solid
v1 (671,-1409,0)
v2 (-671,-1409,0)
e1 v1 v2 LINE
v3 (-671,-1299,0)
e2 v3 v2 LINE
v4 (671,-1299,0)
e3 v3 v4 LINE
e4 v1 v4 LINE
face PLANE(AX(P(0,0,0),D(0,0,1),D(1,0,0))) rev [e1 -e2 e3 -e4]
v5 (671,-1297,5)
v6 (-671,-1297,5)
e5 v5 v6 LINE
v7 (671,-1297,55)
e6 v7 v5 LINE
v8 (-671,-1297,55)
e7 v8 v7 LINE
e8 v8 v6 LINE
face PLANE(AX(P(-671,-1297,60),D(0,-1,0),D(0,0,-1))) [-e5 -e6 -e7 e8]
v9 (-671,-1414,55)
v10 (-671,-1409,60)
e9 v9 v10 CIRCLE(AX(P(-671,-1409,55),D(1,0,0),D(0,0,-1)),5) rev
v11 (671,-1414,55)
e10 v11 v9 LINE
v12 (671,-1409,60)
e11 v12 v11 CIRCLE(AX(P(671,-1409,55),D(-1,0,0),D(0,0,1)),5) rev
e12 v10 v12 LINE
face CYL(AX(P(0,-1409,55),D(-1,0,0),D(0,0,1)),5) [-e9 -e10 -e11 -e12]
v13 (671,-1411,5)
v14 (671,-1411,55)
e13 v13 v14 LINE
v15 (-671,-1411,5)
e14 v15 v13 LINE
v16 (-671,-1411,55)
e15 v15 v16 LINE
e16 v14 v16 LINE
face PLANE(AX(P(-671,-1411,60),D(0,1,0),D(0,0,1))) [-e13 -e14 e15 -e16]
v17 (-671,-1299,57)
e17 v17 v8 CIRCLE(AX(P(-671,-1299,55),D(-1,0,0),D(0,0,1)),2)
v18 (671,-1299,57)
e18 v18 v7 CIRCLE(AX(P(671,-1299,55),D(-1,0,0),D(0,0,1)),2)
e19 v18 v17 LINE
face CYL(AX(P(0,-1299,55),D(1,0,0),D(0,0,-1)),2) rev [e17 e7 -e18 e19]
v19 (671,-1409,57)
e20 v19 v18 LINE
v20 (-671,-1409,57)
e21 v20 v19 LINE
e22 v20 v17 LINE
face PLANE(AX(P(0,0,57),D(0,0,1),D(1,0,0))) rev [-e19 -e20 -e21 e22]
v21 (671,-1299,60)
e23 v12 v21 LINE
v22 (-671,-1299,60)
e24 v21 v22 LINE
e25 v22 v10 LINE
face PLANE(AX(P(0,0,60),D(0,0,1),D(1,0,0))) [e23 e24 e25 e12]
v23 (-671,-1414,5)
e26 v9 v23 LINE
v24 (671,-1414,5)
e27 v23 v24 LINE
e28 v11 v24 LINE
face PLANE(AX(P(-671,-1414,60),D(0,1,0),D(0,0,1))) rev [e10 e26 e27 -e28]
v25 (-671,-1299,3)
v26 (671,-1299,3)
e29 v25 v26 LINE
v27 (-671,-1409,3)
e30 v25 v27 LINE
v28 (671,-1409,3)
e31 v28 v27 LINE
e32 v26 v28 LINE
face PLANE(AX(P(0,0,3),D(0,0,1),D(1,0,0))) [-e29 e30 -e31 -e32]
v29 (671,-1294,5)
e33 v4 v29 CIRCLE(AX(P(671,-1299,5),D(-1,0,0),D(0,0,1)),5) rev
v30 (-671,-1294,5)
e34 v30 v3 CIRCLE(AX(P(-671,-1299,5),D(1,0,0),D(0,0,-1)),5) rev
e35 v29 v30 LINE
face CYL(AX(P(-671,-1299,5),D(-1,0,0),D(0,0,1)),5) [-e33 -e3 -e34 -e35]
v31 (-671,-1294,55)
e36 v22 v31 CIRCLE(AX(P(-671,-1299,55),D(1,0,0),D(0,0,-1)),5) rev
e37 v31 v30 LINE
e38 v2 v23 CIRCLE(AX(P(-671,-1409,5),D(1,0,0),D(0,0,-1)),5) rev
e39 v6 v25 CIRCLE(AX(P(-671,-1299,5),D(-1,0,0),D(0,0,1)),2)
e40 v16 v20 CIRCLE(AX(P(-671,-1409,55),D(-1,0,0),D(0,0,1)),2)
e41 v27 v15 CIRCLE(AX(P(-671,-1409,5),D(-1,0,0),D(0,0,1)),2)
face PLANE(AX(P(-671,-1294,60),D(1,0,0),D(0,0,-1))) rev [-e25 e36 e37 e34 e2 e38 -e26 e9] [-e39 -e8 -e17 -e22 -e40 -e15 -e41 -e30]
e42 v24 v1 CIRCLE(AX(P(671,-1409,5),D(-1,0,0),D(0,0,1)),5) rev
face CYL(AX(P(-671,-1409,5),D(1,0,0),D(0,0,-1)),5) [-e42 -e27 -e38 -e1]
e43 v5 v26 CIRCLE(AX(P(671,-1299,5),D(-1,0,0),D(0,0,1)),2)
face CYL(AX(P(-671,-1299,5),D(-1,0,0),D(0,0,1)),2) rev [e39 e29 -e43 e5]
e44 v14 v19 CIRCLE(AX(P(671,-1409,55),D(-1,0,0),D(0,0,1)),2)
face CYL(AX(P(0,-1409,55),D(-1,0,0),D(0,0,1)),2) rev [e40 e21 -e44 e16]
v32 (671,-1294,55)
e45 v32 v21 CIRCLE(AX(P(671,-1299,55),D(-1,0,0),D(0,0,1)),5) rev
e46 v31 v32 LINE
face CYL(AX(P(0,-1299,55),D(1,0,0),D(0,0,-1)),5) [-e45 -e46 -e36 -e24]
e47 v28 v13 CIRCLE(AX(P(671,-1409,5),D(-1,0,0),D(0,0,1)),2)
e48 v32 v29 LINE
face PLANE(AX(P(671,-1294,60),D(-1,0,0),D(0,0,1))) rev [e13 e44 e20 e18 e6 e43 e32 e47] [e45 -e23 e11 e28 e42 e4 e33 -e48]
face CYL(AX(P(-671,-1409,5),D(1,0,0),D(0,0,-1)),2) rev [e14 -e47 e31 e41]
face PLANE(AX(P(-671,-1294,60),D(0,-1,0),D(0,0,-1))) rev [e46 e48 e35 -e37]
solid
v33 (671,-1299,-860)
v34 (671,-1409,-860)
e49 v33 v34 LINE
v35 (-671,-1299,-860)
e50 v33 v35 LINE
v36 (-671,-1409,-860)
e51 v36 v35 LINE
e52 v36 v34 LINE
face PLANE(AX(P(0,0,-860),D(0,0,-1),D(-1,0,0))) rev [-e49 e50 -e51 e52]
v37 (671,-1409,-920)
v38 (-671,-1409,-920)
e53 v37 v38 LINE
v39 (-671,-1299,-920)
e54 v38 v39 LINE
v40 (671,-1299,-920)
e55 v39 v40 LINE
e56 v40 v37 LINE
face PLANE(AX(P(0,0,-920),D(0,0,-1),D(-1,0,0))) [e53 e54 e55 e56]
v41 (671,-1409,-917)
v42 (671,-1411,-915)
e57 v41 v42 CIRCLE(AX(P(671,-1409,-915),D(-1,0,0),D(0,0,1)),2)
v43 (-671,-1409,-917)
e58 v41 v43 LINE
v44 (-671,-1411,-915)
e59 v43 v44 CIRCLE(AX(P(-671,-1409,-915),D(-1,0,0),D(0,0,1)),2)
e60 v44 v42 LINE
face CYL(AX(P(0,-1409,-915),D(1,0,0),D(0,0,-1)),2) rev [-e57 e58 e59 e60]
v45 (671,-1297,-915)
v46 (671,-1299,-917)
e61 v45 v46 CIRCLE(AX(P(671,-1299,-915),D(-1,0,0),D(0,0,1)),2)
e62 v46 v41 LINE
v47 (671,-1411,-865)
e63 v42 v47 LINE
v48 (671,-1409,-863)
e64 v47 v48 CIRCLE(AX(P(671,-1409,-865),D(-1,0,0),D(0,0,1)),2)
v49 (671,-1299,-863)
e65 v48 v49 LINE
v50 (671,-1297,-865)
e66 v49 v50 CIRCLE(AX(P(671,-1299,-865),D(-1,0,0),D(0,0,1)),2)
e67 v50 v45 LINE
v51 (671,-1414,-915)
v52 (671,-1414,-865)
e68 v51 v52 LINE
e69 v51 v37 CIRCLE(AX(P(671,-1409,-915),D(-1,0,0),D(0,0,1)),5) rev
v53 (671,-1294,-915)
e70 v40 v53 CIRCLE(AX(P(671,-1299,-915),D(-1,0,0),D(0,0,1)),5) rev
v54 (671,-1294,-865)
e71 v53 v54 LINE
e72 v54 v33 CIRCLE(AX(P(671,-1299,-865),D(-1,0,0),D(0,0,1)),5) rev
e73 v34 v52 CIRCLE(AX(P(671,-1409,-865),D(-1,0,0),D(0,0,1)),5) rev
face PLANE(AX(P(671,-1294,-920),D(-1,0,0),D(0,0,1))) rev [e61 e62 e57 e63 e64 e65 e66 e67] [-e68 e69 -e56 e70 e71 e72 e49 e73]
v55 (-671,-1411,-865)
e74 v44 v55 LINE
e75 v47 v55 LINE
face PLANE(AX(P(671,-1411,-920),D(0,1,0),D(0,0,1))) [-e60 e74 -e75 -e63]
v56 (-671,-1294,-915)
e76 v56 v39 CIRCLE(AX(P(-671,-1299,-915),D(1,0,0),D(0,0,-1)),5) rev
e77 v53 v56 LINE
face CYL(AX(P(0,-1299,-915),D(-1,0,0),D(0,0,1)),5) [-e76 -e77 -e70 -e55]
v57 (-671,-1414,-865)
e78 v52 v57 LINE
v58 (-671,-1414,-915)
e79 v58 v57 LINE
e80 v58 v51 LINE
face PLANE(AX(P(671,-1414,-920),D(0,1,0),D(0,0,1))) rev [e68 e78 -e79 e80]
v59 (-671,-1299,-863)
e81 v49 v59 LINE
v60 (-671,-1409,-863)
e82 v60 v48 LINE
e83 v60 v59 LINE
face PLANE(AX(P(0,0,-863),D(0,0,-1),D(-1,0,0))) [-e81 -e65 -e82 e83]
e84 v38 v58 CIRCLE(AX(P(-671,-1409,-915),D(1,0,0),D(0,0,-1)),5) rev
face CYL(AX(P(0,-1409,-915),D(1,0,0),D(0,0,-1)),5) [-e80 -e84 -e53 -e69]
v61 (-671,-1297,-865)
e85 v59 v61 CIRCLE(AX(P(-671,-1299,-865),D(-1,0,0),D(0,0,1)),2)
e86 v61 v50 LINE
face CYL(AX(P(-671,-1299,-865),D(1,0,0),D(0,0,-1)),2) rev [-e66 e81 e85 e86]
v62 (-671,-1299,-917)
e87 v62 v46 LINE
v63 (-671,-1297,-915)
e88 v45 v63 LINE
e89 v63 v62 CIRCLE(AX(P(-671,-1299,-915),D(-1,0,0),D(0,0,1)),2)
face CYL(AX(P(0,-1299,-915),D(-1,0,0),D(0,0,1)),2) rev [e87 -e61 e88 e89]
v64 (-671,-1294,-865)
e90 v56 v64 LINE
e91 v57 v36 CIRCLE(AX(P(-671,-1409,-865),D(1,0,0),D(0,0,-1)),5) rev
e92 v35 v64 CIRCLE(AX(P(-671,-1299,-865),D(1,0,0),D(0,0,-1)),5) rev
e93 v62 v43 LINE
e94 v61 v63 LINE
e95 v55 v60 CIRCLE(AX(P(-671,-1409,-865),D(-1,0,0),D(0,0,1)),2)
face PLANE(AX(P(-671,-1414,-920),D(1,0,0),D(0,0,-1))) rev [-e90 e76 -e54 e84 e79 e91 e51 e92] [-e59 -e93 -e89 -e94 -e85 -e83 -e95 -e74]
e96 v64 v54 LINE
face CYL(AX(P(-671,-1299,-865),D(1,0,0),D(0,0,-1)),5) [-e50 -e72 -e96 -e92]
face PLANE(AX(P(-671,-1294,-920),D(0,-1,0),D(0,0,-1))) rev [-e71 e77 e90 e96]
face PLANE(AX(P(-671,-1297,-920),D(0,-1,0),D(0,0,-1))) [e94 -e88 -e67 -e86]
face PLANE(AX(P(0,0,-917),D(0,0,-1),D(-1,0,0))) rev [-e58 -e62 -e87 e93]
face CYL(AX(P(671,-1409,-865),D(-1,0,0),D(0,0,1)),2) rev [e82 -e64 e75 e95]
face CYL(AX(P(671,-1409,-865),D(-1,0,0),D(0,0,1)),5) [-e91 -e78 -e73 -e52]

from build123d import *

# Parameters (mm, degrees)
SKETCH1_W           = 1342
SKETCH1_H           = 120
BOSS_EXTRUDE1_DEPTH = 60
SKETCH4_W           = 1342
SKETCH4_H           = 120
BOSS_EXTRUDE2_DEPTH = 60
FILLET2_R           = 5
FILLET3_R           = 5
SHELL1_START        = -668
SHELL1_DEPTH        = 1336
SHELL2_START        = -668
SHELL2_DEPTH        = 1336
CUT_EXTRUDE2_DEPTH  = 2156.634477364


# Read off the part's stored shape, not the designer's step: Shell1, Shell2
with BuildPart() as part:
    # Sketch1 → Boss-Extrude1 (new body)
    with BuildSketch(Plane.XY):
        with Locations((0, -1354)):
            Rectangle(SKETCH1_W, SKETCH1_H)
    extrude(amount=BOSS_EXTRUDE1_DEPTH)

    # Fillet3
    fillet3_edges = [part.edges().sort_by_distance(p)[0] for p in [
        (0, -1414, 60),
        (0, -1414, 0),
        (0, -1294, 0),
        (0, -1294, 60),
    ]]
    fillet(fillet3_edges, radius=FILLET3_R)

    # Shell1 outline → Shell1 (cut)
    with BuildSketch(Plane.YZ.offset(SHELL1_START)):
        with BuildLine():
            Line((-1297, 5), (-1297, 55))
            ThreePointArc((-1297, 55), (-1297.585786438, 56.414213562), (-1299, 57))
            Line((-1299, 57), (-1409, 57))
            ThreePointArc((-1409, 57), (-1410.414213562, 56.414213562), (-1411, 55))
            Line((-1411, 55), (-1411, 5))
            ThreePointArc((-1411, 5), (-1410.414213562, 3.585786438), (-1409, 3))
            Line((-1409, 3), (-1299, 3))
            ThreePointArc((-1299, 3), (-1297.585786438, 3.585786438), (-1297, 5))
        make_face()
    extrude(amount=SHELL1_DEPTH, mode=Mode.SUBTRACT)


with BuildPart() as body_2:
    # Sketch4 → Boss-Extrude2 (new body)
    with BuildSketch(Plane(origin=(0, 0, -860), x_dir=(-1, 0, 0), z_dir=(0, 0, -1))):
        with Locations((0, -1354)):
            Rectangle(SKETCH4_W, SKETCH4_H)
    extrude(amount=BOSS_EXTRUDE2_DEPTH)

    # Fillet2
    fillet2_edges = [body_2.edges().sort_by_distance(p)[0] for p in [
        (0, -1414, -920),
        (0, -1294, -920),
        (0, -1414, -860),
        (0, -1294, -860),
    ]]
    fillet(fillet2_edges, radius=FILLET2_R)

    # Shell2 outline → Shell2 (cut)
    with BuildSketch(Plane.YZ.offset(SHELL2_START)):
        with BuildLine():
            Line((-1297, -915), (-1297, -865))
            ThreePointArc((-1297, -865), (-1297.585786438, -863.585786438), (-1299, -863))
            Line((-1299, -863), (-1409, -863))
            ThreePointArc((-1409, -863), (-1410.414213562, -863.585786438), (-1411, -865))
            Line((-1411, -865), (-1411, -915))
            ThreePointArc((-1411, -915), (-1410.414213562, -916.414213562), (-1409, -917))
            Line((-1409, -917), (-1299, -917))
            ThreePointArc((-1299, -917), (-1297.585786438, -916.414213562), (-1297, -915))
        make_face()
    extrude(amount=SHELL2_DEPTH, mode=Mode.SUBTRACT)


with BuildPart() as cut_extrude2_tool:
    # Sketch3 → Cut-Extrude2 (new, through all)
    with BuildSketch(Plane.ZY.offset(671)):
        with BuildLine():
            Line((5, -1411), (55, -1411))
            ThreePointArc((55, -1411), (56.414213562, -1410.414213562), (57, -1409))
            Line((57, -1409), (57, -1299))
            ThreePointArc((57, -1299), (56.414213562, -1297.585786438), (55, -1297))
            Line((55, -1297), (5, -1297))
            ThreePointArc((5, -1297), (3.585786438, -1297.585786438), (3, -1299))
            Line((3, -1299), (3, -1409))
            ThreePointArc((3, -1409), (3.585786438, -1410.414213562), (5, -1411))
        make_face()
        with BuildLine():
            Line((-915, -1411), (-865, -1411))
            ThreePointArc((-865, -1411), (-863.585786438, -1410.414213562), (-863, -1409))
            Line((-863, -1409), (-863, -1299))
            ThreePointArc((-863, -1299), (-863.585786438, -1297.585786438), (-865, -1297))
            Line((-865, -1297), (-915, -1297))
            ThreePointArc((-915, -1297), (-916.414213562, -1297.585786438), (-917, -1299))
            Line((-917, -1299), (-917, -1409))
            ThreePointArc((-917, -1409), (-916.414213562, -1410.414213562), (-915, -1411))
        make_face()
    extrude(amount=-CUT_EXTRUDE2_DEPTH)


with BuildPart() as part_1:
    add(part.part)

    # Cut-Extrude2: cut by cut_extrude2_tool
    add(cut_extrude2_tool.part, mode=Mode.SUBTRACT)


with BuildPart() as body_2_1:
    add(body_2.part)

    # Cut-Extrude2: cut by cut_extrude2_tool
    add(cut_extrude2_tool.part, mode=Mode.SUBTRACT)


solid = Compound([part_1.part, body_2_1.part])
